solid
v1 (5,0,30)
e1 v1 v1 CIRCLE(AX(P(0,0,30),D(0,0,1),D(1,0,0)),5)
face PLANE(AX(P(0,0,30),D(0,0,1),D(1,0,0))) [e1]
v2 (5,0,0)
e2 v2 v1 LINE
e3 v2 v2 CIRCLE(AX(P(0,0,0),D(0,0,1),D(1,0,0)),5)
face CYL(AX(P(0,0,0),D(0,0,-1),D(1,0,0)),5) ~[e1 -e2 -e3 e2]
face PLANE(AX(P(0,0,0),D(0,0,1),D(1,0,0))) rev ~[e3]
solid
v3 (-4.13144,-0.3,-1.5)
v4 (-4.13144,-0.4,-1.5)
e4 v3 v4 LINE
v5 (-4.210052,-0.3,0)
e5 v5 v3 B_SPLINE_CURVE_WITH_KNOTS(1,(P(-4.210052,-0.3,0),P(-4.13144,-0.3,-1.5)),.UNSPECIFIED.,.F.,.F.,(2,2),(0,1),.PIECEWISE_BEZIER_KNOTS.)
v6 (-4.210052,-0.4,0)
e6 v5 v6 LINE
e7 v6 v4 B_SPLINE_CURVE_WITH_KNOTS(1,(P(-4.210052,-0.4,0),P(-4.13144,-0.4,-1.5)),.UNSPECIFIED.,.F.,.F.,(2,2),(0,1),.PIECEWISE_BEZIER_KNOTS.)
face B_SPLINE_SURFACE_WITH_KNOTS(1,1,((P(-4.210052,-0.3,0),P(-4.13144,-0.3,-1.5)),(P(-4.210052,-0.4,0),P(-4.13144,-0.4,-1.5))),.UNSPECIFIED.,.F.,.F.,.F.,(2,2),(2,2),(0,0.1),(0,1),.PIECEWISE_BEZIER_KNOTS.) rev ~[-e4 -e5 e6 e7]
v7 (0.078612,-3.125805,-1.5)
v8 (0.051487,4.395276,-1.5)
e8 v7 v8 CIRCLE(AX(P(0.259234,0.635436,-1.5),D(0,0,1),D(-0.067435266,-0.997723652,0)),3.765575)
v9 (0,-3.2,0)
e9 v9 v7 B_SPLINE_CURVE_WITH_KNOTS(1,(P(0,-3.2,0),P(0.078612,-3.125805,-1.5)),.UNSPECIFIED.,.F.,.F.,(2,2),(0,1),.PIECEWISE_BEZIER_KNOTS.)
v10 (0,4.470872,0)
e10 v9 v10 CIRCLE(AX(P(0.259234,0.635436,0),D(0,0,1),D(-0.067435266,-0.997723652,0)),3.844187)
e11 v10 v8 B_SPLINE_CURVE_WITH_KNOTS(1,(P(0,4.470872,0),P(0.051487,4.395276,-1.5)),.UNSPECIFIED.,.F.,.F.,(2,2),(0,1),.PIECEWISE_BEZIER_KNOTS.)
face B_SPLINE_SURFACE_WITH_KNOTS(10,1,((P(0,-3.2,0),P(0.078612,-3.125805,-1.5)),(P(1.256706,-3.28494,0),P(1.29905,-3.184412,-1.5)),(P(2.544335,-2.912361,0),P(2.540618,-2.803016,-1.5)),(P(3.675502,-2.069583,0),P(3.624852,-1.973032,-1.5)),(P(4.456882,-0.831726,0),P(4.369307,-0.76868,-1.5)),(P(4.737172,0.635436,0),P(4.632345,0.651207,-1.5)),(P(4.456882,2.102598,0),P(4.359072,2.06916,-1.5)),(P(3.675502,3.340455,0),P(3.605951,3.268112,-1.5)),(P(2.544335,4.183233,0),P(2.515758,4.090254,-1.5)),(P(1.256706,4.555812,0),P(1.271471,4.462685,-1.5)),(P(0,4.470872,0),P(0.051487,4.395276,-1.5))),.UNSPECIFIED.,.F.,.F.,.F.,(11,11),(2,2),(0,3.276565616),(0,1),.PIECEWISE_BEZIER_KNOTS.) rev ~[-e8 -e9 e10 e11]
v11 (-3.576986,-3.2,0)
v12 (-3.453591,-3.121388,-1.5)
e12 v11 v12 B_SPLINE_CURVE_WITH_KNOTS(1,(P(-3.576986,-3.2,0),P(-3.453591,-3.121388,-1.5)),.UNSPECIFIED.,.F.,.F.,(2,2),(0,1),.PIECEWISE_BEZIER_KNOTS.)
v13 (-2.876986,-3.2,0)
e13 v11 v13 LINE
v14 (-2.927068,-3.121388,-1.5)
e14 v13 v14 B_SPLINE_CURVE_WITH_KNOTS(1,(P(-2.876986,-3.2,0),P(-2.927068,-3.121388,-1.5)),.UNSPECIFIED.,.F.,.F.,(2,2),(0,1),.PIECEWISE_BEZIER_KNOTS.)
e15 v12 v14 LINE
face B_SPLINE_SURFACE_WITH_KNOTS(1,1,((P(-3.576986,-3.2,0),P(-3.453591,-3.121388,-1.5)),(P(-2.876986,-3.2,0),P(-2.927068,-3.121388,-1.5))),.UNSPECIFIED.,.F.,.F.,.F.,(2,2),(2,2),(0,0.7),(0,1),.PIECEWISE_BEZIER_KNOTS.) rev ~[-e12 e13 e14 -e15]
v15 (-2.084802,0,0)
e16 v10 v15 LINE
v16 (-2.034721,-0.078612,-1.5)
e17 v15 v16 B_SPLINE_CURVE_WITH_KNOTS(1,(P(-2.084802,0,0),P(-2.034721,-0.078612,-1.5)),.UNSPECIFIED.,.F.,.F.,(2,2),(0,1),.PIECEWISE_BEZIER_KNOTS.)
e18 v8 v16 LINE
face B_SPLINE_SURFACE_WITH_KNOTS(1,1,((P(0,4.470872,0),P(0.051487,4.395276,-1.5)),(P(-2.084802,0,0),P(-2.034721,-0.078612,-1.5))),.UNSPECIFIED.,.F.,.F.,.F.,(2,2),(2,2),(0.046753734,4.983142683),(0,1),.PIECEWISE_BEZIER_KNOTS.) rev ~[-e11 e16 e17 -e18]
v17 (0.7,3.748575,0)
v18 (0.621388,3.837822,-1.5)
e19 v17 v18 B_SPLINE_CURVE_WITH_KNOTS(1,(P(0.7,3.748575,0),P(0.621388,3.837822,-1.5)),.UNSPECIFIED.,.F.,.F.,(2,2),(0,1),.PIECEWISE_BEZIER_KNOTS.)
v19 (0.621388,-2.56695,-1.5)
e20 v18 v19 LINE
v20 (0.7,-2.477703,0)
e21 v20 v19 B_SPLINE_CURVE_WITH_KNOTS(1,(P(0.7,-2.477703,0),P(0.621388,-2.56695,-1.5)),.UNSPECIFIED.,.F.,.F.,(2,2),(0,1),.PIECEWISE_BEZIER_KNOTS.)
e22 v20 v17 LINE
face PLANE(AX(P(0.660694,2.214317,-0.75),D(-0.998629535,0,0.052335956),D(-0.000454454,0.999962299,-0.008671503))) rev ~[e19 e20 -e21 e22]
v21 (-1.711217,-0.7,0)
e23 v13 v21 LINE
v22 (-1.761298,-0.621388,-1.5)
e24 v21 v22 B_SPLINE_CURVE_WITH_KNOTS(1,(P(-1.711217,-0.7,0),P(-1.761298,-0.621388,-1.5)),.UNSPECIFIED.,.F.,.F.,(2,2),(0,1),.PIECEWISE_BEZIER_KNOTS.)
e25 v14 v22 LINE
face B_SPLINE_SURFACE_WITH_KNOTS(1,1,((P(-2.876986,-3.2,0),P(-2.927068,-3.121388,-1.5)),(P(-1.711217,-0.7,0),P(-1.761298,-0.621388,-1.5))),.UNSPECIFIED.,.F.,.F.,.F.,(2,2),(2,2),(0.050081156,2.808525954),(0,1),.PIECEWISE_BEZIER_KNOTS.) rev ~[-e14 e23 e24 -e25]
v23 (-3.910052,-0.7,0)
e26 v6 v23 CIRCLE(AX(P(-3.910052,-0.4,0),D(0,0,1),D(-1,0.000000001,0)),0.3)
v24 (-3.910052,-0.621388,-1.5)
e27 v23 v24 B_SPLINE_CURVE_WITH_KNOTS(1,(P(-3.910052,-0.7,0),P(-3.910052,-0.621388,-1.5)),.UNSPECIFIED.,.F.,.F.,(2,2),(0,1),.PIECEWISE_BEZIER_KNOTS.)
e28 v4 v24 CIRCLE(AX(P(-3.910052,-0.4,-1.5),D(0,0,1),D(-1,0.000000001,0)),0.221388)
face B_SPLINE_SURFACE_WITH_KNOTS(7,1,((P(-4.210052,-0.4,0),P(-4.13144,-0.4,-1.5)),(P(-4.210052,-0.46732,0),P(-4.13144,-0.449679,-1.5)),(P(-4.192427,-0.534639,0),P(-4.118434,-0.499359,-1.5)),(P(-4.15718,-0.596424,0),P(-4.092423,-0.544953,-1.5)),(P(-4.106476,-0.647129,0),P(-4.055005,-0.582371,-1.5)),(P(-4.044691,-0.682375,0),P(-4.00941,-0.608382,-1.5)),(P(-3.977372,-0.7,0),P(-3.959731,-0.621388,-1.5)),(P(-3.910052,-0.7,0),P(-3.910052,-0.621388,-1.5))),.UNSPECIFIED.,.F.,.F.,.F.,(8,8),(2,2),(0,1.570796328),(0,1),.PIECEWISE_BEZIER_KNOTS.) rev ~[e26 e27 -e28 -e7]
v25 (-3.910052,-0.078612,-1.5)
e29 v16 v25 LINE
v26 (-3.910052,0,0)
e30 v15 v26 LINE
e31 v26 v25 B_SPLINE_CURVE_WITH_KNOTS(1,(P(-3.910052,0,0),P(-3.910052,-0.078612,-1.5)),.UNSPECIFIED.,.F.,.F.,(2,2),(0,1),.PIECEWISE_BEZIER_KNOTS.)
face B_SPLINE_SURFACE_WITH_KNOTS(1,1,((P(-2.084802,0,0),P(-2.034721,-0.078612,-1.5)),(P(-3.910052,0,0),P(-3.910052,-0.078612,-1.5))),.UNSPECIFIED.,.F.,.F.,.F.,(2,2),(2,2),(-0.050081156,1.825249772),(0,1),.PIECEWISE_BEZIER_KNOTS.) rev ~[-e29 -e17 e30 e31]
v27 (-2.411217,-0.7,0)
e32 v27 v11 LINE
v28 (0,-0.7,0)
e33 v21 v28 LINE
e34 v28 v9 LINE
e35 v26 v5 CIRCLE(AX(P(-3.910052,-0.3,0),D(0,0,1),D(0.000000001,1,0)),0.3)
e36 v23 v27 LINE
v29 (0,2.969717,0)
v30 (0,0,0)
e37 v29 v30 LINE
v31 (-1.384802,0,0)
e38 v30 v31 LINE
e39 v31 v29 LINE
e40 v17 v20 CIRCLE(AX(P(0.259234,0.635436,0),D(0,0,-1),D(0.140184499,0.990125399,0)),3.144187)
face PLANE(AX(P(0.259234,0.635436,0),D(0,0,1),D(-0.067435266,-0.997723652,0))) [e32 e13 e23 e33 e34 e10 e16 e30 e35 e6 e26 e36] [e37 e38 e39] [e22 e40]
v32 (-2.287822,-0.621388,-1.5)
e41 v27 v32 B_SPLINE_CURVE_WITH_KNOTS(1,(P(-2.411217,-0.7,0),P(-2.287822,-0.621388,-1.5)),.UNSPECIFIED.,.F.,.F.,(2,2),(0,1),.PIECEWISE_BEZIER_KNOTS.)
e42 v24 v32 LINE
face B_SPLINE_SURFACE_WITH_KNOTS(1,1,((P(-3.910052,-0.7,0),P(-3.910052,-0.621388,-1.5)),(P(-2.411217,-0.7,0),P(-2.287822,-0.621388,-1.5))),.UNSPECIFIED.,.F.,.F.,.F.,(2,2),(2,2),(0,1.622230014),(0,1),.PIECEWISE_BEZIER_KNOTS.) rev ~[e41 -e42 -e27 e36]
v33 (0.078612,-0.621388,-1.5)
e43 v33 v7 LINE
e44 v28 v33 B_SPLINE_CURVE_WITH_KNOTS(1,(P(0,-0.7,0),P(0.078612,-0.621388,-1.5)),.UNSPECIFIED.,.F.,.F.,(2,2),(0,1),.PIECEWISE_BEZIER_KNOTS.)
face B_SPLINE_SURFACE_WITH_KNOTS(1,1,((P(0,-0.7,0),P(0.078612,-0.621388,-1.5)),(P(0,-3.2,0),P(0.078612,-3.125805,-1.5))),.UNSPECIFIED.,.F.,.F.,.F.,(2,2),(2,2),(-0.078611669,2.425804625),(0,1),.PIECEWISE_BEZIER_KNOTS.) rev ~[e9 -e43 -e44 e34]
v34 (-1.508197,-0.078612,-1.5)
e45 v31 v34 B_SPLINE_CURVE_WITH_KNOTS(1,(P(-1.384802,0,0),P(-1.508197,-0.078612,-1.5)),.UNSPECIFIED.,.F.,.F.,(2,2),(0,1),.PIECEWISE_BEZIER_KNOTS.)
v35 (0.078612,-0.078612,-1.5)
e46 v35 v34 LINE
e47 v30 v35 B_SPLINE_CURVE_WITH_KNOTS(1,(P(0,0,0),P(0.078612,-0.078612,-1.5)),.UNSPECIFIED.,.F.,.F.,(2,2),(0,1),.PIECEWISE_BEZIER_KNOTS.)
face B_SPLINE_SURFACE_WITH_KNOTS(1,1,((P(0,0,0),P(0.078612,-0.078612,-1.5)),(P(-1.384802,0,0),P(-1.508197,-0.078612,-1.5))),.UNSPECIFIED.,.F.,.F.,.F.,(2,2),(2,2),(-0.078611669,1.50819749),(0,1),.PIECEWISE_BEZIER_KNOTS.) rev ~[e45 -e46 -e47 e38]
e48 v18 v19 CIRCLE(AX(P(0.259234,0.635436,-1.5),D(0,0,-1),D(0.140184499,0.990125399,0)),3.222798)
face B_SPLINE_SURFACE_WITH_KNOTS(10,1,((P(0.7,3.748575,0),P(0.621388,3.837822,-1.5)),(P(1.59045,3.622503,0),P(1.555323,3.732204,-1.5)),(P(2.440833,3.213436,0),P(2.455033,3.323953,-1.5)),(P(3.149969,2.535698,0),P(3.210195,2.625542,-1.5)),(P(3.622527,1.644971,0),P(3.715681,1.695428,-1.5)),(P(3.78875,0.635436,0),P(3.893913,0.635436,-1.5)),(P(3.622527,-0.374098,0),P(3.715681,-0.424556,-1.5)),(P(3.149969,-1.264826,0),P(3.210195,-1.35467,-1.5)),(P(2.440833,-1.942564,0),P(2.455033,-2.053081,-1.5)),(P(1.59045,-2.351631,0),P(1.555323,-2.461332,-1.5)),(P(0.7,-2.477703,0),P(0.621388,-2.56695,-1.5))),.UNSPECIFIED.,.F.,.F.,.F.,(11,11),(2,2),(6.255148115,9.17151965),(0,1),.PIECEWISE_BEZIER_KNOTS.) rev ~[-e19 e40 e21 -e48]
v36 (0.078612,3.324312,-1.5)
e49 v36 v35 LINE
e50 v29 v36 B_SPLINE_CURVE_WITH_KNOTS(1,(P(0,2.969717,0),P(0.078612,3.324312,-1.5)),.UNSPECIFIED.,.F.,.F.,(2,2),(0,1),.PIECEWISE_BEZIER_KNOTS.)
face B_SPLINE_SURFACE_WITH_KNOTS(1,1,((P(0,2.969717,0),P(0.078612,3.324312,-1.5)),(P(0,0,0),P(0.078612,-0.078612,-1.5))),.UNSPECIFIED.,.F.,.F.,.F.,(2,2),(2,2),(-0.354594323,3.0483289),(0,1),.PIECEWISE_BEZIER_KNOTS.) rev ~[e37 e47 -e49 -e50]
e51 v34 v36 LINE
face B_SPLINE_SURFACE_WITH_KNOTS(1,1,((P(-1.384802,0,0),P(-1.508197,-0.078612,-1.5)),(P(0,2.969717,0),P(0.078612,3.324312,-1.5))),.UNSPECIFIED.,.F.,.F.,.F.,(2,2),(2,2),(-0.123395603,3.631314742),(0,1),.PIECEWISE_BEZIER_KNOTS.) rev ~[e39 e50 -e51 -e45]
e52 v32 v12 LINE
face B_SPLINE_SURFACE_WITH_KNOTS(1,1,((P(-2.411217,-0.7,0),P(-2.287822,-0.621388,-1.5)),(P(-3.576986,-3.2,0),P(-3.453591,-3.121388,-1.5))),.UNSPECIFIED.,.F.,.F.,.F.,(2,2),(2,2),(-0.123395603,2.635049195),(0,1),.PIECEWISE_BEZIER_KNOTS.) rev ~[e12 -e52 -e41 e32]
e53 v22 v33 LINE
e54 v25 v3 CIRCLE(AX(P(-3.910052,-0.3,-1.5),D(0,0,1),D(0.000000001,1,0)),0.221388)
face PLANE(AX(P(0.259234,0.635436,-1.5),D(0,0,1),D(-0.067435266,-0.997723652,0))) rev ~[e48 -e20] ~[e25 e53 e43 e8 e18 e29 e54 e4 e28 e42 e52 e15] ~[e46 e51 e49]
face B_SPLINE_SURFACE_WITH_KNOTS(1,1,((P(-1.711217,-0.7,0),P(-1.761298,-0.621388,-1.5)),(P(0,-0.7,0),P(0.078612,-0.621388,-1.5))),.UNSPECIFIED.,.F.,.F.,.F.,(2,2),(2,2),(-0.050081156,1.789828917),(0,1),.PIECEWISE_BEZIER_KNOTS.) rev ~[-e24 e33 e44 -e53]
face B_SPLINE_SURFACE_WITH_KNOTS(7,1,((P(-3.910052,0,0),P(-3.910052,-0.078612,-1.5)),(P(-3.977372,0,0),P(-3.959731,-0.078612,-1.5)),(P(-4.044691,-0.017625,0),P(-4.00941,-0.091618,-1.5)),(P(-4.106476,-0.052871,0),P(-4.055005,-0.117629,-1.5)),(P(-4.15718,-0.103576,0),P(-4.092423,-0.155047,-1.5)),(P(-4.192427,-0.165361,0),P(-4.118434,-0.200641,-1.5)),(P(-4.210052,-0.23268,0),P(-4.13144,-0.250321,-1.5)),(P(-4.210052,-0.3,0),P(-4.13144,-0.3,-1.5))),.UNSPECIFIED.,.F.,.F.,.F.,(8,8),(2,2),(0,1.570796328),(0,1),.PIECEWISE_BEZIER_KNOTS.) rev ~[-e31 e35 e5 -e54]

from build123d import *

# Parameters (mm, degrees)
F1_DEPTH = 1.5
F1_TAPER = 3
F0_R     = 5
F2_DEPTH = 30


with BuildPart() as f1:
    # F0 (on Top) → F1 (new body)
    with BuildSketch(Plane.XY):
        with BuildLine():
            ThreePointArc((0, -3.2), (4.103420501, 0.6354360376), (0, 4.4708720751))
            Line((0, 4.4708720751), (-2.0848018873, 0))
            Line((-2.0848018873, 0), (-3.9100516587, 0))
            ThreePointArc((-3.9100516587, 0), (-4.1221836931, -0.0878679656), (-4.2100516587, -0.3))
            Line((-4.2100516587, -0.3), (-4.2100516587, -0.4))
            ThreePointArc((-4.2100516587, -0.4), (-4.1221836931, -0.6121320344), (-3.9100516587, -0.7))
            Line((-3.9100516587, -0.7), (-2.411217248, -0.7))
            Line((-2.411217248, -0.7), (-3.5769863934, -3.2))
            Line((-3.5769863934, -3.2), (-2.8769863934, -3.2))
            Line((-2.8769863934, -3.2), (-1.711217248, -0.7))
            Line((-1.711217248, -0.7), (0, -0.7))
            Line((0, -0.7), (0, -3.2))
        make_face()
        Polygon((0, 0), (-1.3848018873, 0), (0, 2.9697172308), align=None, mode=Mode.SUBTRACT)
        with BuildLine():
            Line((0.7, -2.4777031195), (0.7, 3.7485751946))
            ThreePointArc((0.7, 3.7485751946), (3.403420501, 0.6354360376), (0.7, -2.4777031195))
        make_face(mode=Mode.SUBTRACT)
    extrude(amount=-F1_DEPTH, taper=F1_TAPER)


with BuildPart() as f2:
    # F0 (on Top) → F2 (new body)
    with BuildSketch(Plane.XY):
        Circle(F0_R)
        with BuildLine():
            Line((-2.0848018873, 0), (0, 4.4708720751))
            ThreePointArc((0, 4.4708720751), (4.103420501, 0.6354360376), (0, -3.2))
            Line((0, -3.2), (0, -0.7))
            Line((0, -0.7), (-1.711217248, -0.7))
            Line((-1.711217248, -0.7), (-2.8769863934, -3.2))
            Line((-2.8769863934, -3.2), (-3.5769863934, -3.2))
            Line((-3.5769863934, -3.2), (-2.411217248, -0.7))
            Line((-2.411217248, -0.7), (-3.9100516587, -0.7))
            ThreePointArc((-3.9100516587, -0.7), (-4.1221836931, -0.6121320344), (-4.2100516587, -0.4))
            Line((-4.2100516587, -0.4), (-4.2100516587, -0.3))
            ThreePointArc((-4.2100516587, -0.3), (-4.1221836931, -0.0878679656), (-3.9100516587, 0))
            Line((-3.9100516587, 0), (-2.0848018873, 0))
        make_face(mode=Mode.SUBTRACT)
        with BuildLine():
            ThreePointArc((0, -3.2), (4.103420501, 0.6354360376), (0, 4.4708720751))
            Line((0, 4.4708720751), (-2.0848018873, 0))
            Line((-2.0848018873, 0), (-3.9100516587, 0))
            ThreePointArc((-3.9100516587, 0), (-4.1221836931, -0.0878679656), (-4.2100516587, -0.3))
            Line((-4.2100516587, -0.3), (-4.2100516587, -0.4))
            ThreePointArc((-4.2100516587, -0.4), (-4.1221836931, -0.6121320344), (-3.9100516587, -0.7))
            Line((-3.9100516587, -0.7), (-2.411217248, -0.7))
            Line((-2.411217248, -0.7), (-3.5769863934, -3.2))
            Line((-3.5769863934, -3.2), (-2.8769863934, -3.2))
            Line((-2.8769863934, -3.2), (-1.711217248, -0.7))
            Line((-1.711217248, -0.7), (0, -0.7))
            Line((0, -0.7), (0, -3.2))
        make_face()
        Polygon((0, 0), (-1.3848018873, 0), (0, 2.9697172308), align=None, mode=Mode.SUBTRACT)
        with BuildLine():
            Line((0.7, -2.4777031195), (0.7, 3.7485751946))
            ThreePointArc((0.7, 3.7485751946), (3.403420501, 0.6354360376), (0.7, -2.4777031195))
        make_face(mode=Mode.SUBTRACT)
        Polygon((0, 2.9697172308), (-1.3848018873, 0), (0, 0), align=None)
        with BuildLine():
            ThreePointArc((0.7, -2.4777031195), (3.403420501, 0.6354360376), (0.7, 3.7485751946))
            Line((0.7, 3.7485751946), (0.7, -2.4777031195))
        make_face()
    extrude(amount=F2_DEPTH)


solid = Compound([f1.part, f2.part])
